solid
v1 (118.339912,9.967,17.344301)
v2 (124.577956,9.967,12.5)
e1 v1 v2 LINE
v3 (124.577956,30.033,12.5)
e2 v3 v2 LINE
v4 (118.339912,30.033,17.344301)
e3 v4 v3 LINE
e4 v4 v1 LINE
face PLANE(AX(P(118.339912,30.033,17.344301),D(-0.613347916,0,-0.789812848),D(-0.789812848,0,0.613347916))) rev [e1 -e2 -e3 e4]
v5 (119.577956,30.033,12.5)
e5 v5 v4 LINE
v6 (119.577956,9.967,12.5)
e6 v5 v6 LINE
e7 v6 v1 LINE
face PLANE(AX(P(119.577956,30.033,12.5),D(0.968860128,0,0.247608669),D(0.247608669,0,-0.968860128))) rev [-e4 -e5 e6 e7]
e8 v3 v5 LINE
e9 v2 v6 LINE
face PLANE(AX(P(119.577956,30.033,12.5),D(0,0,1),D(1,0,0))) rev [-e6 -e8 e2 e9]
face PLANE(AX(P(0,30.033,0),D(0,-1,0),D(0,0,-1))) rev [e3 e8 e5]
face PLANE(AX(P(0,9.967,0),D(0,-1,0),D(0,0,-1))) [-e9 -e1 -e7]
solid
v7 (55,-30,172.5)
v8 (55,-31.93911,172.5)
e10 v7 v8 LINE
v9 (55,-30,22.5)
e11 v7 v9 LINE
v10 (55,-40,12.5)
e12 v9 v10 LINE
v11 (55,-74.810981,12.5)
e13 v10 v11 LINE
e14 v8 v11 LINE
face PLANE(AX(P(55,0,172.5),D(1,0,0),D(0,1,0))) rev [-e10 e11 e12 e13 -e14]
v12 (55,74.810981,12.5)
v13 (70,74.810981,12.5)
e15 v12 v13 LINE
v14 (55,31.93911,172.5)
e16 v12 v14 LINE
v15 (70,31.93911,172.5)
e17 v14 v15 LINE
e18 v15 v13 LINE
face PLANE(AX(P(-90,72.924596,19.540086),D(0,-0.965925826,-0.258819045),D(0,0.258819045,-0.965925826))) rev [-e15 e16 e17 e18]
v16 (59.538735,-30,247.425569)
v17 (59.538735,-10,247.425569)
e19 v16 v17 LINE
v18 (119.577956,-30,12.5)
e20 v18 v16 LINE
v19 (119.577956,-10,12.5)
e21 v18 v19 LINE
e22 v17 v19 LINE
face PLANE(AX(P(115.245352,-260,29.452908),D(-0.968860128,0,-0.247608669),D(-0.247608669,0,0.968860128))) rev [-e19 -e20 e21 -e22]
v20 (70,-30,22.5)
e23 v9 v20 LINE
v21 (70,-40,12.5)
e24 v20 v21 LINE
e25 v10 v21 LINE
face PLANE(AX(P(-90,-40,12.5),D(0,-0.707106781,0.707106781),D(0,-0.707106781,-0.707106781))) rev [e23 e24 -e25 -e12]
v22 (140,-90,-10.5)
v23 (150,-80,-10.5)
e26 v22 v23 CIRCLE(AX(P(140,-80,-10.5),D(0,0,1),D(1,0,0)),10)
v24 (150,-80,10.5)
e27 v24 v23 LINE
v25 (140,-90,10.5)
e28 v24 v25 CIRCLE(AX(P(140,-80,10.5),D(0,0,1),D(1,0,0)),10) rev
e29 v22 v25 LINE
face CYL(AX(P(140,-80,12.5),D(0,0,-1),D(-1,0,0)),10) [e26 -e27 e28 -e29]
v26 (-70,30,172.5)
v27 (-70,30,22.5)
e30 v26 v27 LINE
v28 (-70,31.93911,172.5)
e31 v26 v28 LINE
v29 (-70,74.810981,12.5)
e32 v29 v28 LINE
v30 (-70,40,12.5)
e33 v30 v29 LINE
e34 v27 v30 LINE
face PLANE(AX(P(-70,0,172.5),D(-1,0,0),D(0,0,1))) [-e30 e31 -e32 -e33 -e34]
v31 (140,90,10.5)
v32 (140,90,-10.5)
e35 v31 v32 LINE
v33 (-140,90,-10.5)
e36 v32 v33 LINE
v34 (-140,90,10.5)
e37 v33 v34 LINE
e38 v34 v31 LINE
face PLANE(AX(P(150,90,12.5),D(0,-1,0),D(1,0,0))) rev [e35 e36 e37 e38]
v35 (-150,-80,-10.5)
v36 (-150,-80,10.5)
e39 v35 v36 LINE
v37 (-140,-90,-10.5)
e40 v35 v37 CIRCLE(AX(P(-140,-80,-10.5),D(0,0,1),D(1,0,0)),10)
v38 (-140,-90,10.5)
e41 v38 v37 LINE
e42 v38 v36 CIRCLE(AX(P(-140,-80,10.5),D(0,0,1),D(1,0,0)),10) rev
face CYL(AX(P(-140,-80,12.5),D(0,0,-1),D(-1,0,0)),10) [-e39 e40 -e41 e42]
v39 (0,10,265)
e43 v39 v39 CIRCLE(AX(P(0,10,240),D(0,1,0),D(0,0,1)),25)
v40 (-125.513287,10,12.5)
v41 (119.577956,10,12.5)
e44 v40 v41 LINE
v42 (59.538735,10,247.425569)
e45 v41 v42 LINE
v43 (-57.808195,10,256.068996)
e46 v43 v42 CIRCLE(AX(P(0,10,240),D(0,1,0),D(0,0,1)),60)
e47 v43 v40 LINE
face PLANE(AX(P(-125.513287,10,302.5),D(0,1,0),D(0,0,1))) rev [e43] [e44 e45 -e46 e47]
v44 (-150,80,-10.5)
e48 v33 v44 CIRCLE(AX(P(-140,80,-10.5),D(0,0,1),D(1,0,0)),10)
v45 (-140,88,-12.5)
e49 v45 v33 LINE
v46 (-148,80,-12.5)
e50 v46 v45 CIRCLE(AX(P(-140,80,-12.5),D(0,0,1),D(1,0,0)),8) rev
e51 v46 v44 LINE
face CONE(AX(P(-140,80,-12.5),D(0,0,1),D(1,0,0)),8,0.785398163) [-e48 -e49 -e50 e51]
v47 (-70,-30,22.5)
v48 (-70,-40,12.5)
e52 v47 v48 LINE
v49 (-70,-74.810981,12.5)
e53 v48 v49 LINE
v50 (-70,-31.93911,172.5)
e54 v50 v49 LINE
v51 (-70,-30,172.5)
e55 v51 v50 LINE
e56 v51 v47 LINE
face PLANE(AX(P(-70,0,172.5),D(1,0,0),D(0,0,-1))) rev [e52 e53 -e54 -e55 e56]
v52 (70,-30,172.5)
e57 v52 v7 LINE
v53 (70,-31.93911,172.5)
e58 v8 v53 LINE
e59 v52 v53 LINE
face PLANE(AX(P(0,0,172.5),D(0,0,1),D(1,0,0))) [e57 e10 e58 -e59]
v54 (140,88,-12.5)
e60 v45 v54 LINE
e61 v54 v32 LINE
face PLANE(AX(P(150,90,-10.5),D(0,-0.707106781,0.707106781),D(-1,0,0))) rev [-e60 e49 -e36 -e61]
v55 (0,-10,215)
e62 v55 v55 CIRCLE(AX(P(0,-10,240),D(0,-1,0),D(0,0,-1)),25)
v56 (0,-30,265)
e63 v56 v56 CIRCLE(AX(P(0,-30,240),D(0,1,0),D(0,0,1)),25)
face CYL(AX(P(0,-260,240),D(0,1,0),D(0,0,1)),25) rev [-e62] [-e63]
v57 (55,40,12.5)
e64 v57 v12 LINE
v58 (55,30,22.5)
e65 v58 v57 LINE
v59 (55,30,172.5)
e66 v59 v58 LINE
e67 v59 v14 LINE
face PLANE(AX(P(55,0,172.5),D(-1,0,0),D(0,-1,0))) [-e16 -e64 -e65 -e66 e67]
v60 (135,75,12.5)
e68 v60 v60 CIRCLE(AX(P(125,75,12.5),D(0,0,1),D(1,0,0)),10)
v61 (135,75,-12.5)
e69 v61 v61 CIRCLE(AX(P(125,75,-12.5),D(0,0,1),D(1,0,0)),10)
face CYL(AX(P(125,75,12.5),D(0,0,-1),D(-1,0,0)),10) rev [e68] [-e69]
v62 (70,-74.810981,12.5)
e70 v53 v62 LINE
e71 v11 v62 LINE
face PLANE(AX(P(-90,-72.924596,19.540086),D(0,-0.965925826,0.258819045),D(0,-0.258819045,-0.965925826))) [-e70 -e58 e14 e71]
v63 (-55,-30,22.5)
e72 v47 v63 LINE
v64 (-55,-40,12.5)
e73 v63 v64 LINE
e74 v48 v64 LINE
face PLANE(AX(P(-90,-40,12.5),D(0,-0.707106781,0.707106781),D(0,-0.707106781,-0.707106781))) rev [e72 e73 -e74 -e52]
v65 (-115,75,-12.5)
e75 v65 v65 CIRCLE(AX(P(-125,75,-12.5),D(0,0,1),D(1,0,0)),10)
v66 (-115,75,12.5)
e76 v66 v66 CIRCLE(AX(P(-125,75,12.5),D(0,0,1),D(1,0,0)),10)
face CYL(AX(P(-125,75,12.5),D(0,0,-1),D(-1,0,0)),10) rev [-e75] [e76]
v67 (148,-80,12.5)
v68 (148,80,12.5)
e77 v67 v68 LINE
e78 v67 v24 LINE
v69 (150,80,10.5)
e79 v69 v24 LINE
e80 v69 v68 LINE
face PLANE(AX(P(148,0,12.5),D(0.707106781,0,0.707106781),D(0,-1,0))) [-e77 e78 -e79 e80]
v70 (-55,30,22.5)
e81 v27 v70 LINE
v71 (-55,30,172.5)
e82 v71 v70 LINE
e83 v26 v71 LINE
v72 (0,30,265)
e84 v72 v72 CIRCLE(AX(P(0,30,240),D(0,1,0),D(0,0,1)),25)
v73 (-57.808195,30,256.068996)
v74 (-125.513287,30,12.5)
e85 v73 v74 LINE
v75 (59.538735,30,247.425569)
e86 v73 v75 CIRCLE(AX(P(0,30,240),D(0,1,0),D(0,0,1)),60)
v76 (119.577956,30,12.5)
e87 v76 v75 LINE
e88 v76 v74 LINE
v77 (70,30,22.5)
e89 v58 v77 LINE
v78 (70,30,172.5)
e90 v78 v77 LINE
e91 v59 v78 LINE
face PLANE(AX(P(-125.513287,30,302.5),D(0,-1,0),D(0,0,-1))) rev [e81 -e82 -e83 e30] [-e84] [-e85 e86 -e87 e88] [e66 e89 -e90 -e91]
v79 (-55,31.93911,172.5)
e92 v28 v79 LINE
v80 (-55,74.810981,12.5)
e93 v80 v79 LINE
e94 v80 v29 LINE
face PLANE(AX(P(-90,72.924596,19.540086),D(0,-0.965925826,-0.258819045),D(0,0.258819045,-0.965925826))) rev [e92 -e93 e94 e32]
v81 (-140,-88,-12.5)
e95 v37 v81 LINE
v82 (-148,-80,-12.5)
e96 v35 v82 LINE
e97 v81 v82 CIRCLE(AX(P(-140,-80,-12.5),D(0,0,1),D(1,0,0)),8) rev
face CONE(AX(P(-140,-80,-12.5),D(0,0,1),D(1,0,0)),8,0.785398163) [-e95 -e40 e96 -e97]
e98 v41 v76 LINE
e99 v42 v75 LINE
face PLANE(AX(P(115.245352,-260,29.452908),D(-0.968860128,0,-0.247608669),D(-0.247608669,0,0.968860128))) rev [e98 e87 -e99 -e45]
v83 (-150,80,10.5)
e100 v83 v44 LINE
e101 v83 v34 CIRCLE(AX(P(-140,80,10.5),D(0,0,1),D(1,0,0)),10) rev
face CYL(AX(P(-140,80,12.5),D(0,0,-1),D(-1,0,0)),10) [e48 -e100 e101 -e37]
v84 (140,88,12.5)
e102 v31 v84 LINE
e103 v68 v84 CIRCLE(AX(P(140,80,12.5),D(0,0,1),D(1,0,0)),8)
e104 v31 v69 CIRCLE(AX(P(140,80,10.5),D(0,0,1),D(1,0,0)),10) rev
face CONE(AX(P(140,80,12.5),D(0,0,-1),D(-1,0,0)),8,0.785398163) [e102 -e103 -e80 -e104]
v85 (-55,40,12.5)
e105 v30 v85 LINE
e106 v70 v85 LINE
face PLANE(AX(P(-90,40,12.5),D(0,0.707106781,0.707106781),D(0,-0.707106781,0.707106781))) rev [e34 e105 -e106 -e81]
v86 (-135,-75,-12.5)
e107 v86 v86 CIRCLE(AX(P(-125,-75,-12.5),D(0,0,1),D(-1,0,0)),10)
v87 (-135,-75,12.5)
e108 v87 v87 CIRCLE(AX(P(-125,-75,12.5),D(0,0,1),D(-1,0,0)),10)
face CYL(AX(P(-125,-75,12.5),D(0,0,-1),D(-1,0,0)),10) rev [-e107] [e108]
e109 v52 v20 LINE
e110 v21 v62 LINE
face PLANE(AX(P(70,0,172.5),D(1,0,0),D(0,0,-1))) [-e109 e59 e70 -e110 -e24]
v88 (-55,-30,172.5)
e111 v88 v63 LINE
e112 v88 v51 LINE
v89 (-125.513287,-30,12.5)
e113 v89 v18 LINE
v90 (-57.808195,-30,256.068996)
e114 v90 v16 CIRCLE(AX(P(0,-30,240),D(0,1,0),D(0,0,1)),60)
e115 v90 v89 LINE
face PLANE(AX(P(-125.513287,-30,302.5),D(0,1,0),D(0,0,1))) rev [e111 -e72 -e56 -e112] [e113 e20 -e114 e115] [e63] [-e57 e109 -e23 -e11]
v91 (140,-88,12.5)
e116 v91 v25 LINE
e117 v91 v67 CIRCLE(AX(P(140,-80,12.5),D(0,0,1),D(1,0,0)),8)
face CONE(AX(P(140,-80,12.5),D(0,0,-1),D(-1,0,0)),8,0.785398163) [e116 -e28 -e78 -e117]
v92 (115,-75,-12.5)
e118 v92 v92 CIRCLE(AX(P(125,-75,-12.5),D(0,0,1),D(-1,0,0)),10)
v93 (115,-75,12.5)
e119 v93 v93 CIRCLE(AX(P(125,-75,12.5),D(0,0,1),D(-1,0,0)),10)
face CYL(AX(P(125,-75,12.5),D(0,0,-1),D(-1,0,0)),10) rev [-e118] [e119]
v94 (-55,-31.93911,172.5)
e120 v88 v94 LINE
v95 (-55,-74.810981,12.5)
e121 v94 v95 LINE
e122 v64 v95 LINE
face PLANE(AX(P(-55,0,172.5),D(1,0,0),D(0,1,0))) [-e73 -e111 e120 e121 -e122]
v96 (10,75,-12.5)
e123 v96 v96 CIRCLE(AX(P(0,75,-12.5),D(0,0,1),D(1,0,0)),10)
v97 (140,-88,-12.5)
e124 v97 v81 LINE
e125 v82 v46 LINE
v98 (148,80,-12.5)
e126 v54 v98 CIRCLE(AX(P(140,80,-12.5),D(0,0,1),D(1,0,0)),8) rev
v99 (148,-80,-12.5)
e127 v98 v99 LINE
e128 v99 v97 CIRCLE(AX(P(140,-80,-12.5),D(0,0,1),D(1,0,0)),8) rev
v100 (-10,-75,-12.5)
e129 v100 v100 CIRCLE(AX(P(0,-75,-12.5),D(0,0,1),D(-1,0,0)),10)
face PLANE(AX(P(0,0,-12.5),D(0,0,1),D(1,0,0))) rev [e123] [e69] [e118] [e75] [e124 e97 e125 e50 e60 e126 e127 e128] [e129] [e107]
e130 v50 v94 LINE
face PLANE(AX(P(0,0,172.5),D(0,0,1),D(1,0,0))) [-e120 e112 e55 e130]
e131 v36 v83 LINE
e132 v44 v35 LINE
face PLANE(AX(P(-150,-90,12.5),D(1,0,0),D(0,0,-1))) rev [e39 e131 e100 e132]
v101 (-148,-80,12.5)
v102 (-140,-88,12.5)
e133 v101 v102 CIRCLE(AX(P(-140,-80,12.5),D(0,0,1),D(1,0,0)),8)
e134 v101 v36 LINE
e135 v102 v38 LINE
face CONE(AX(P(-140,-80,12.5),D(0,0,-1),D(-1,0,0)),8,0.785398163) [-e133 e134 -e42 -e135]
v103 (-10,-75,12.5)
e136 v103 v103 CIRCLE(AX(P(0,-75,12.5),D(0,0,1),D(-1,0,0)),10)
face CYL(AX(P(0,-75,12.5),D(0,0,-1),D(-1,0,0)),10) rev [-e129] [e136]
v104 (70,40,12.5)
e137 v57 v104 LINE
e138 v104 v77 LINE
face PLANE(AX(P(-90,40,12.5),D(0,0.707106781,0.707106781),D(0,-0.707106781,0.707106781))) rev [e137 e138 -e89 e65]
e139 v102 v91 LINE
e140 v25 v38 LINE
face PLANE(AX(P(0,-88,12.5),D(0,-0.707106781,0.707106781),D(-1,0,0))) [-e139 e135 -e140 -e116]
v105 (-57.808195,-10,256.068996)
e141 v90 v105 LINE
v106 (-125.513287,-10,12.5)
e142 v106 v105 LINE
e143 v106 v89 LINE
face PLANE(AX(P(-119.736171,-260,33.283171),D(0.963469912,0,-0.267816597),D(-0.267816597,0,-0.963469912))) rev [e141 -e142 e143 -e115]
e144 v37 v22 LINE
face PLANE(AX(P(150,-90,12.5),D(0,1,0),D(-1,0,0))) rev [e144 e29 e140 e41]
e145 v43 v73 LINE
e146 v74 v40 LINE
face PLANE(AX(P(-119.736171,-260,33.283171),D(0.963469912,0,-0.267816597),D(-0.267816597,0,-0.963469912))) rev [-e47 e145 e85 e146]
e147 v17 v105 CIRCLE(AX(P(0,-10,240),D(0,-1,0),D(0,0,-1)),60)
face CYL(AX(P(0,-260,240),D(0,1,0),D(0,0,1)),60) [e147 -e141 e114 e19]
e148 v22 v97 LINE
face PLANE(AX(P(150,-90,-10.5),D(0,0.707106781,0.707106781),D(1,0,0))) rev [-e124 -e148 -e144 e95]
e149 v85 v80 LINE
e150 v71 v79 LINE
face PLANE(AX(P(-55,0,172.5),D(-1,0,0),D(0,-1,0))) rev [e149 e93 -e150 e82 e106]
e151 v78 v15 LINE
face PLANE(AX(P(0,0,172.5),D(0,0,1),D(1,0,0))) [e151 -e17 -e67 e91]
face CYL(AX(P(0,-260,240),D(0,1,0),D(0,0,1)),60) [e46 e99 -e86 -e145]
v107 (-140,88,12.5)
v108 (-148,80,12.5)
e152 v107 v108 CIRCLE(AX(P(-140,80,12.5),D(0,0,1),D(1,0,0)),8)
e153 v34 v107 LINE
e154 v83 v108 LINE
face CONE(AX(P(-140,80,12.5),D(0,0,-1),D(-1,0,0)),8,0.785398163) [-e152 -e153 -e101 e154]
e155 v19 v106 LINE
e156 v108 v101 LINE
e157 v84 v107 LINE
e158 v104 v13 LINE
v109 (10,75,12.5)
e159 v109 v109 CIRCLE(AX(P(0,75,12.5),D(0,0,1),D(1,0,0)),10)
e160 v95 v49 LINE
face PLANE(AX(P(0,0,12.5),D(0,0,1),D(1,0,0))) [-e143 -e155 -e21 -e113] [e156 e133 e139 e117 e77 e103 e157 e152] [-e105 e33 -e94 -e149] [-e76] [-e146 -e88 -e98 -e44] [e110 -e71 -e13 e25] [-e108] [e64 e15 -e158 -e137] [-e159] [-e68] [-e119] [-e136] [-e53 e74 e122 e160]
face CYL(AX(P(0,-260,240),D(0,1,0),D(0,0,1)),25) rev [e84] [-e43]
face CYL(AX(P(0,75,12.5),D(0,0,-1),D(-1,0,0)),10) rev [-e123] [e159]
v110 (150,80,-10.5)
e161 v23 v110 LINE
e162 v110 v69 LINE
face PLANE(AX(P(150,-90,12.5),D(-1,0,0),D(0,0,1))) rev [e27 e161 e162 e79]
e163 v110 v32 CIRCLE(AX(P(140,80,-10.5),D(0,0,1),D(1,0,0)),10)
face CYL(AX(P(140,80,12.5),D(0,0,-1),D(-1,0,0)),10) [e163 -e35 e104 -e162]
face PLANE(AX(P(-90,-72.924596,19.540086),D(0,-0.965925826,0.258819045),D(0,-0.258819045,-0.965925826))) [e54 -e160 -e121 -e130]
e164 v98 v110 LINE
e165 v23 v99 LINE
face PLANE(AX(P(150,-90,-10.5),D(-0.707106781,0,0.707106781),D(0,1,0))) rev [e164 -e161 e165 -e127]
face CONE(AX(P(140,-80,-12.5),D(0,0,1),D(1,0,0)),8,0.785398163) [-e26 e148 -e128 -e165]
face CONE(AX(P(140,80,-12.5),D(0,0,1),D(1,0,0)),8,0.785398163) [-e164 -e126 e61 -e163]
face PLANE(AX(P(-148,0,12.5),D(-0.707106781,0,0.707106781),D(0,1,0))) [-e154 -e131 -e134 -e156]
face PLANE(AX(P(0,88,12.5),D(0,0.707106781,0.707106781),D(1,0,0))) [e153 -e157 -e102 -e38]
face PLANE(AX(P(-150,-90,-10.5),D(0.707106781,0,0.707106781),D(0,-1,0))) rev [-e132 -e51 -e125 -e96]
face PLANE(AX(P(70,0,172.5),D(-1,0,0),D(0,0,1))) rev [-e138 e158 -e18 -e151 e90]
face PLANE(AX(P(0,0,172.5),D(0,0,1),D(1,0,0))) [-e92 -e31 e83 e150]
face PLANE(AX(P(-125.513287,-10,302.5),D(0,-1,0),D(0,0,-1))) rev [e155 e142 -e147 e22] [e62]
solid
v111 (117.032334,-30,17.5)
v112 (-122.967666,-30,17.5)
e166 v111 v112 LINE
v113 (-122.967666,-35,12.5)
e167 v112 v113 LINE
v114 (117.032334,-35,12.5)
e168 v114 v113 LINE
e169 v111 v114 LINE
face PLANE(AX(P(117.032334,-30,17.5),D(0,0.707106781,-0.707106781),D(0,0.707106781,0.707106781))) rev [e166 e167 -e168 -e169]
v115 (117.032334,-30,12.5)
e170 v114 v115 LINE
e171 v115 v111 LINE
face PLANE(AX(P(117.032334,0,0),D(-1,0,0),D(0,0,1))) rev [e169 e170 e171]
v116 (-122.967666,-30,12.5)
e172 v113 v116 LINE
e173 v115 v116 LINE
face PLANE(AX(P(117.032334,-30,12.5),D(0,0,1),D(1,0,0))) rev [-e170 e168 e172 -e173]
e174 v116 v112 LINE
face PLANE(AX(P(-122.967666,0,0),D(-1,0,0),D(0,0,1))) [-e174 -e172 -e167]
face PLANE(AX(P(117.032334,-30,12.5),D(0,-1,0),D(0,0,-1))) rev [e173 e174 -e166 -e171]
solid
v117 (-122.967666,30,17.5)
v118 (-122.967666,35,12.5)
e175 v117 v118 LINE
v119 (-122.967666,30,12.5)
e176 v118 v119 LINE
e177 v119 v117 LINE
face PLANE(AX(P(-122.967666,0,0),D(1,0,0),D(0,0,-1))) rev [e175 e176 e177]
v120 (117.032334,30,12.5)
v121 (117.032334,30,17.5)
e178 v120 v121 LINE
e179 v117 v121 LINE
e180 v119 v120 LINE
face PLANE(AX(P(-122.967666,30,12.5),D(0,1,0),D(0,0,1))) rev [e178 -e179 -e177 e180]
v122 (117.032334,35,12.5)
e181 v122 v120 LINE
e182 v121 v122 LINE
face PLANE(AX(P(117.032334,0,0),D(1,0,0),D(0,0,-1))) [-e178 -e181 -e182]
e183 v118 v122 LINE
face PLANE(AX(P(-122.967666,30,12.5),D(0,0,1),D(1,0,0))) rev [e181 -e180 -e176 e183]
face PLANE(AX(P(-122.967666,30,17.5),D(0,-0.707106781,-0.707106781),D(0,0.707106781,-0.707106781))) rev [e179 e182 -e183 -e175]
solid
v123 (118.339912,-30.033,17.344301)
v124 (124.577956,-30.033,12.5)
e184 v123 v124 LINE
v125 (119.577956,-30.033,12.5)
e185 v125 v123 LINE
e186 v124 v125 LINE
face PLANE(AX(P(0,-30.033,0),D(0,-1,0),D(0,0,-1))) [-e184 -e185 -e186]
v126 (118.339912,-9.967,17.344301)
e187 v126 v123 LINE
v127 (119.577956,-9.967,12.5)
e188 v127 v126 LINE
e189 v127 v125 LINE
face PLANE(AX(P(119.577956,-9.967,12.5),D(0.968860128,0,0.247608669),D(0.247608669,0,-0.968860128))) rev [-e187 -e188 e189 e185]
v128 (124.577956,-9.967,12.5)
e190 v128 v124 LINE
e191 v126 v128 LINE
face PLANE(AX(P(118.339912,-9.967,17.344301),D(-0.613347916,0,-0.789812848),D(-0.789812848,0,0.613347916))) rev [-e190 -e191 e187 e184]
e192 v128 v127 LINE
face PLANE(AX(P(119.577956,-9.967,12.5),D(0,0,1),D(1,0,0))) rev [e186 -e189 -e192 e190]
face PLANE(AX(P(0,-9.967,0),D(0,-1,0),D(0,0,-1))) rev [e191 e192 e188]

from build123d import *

# Parameters (mm, degrees)
SKETCH2_W           = 300
SKETCH2_H           = 180
SKETCH2_R           = 10
BOSS_EXTRUDE1_DEPTH = 12.5
FILLET1_R           = 10
CHAMFER3_SIZE       = 2
SKETCH3_W           = 245.602376855
SKETCH3_H           = 20
BOSS_EXTRUDE2_DEPTH = 290
SKETCH4_R           = 25
CUT_EXTRUDE2_DEPTH  = 290
SKETCH5_W           = 15
SKETCH5_H           = 44.810981007
BOSS_EXTRUDE3_DEPTH = 160
CUT_EXTRUDE4_DEPTH  = 160
CUT_EXTRUDE5_DEPTH  = 160
GUSSET4_START       = 9.967
GUSSET4_DEPTH       = 20.066
GUSSET5_START       = -30.033
GUSSET5_DEPTH       = 20.066
GUSSET6_THICKNESS   = 240
GUSSET7_THICKNESS   = 240


# Read off the part's stored shape, not the designer's step: Gusset4, Gusset5
with BuildPart() as part:
    # Sketch2 → Boss-Extrude1 (new, symmetric)
    with BuildSketch(Plane.XY):
        Rectangle(SKETCH2_W, SKETCH2_H)
        with Locations((125, 75)):
            Circle(SKETCH2_R, mode=Mode.SUBTRACT)
        with Locations((-125, 75)):
            Circle(SKETCH2_R, mode=Mode.SUBTRACT)
        with Locations((0, 75)):
            Circle(SKETCH2_R, mode=Mode.SUBTRACT)
        with Locations(Location((125, -75, 0), (0, 0, 180))):
            Circle(SKETCH2_R, mode=Mode.SUBTRACT)
        with Locations(Location((0, -75, 0), (0, 0, 180))):
            Circle(SKETCH2_R, mode=Mode.SUBTRACT)
        with Locations(Location((-125, -75, 0), (0, 0, 180))):
            Circle(SKETCH2_R, mode=Mode.SUBTRACT)
    extrude(amount=BOSS_EXTRUDE1_DEPTH, both=True)

    # Fillet1
    fillet1_edges = [part.edges().sort_by_distance(p)[0] for p in [
        (-150, 90, 0),
        (150, 90, 0),
        (150, -90, 0),
        (-150, -90, 0),
    ]]
    fillet(fillet1_edges, radius=FILLET1_R)

    # Chamfer3
    chamfer3_edges = [part.edges().sort_by_distance(p)[0] for p in [
        (-150, 0, -12.5),
        (-150, 0, 12.5),
        (0, 90, -12.5),
        (150, 0, -12.5),
        (0, -90, -12.5),
        (147.071067812, 87.071067812, -12.5),
        (147.071067812, -87.071067812, -12.5),
        (-147.071067812, -87.071067812, -12.5),
        (-147.071067812, 87.071067812, -12.5),
        (0, 90, 12.5),
        (0, -90, 12.5),
        (150, 0, 12.5),
        (147.071067812, 87.071067812, 12.5),
        (147.071067812, -87.071067812, 12.5),
        (-147.071067812, -87.071067812, 12.5),
        (-147.071067812, 87.071067812, 12.5),
    ]]
    chamfer(chamfer3_edges, length=CHAMFER3_SIZE)

    # Sketch3 → Boss-Extrude2 (add)
    with BuildSketch(Plane.XY.offset(12.5)):
        with Locations((-2.712098758, 20)):
            Rectangle(SKETCH3_W, SKETCH3_H)
        with Locations((-2.712098758, -20)):
            Rectangle(SKETCH3_W, SKETCH3_H)
    extrude(amount=BOSS_EXTRUDE2_DEPTH)

    # Sketch4 → Cut-Extrude2 (cut)
    with BuildSketch(Plane(origin=(0, 30, 0), x_dir=(1, 0, 0), z_dir=(0, 1, 0))):
        with Locations(Location((0, -240, 0), (0, 0, 270))):
            Circle(SKETCH4_R)
        with BuildLine():
            Line((120.08908967, -12.5), (119.577955686, -12.5))
            Line((119.577955686, -12.5), (59.538734687, -247.42556879))
            ThreePointArc((59.538734687, -247.42556879), (4.407482246, -299.837898528), (-57.808194698, -256.068995792))
            Line((-57.808194698, -256.068995792), (-125.513287185, -12.5))
            Line((-125.513287185, -12.5), (-125.513287185, -302.5))
            Line((-125.513287185, -302.5), (120.08908967, -302.5))
            Line((120.08908967, -302.5), (120.08908967, -12.5))
        make_face()
    extrude(amount=-CUT_EXTRUDE2_DEPTH, mode=Mode.SUBTRACT)

    # Sketch5 → Boss-Extrude3 (add)
    with BuildSketch(Plane.XY.offset(12.5)):
        with Locations((-62.5, 52.405490504)):
            Rectangle(SKETCH5_W, SKETCH5_H)
        with Locations((62.5, 52.405490504)):
            Rectangle(SKETCH5_W, SKETCH5_H)
        with Locations((-62.5, -52.405490504)):
            Rectangle(SKETCH5_W, SKETCH5_H)
        with Locations((62.5, -52.405490504)):
            Rectangle(SKETCH5_W, SKETCH5_H)
    extrude(amount=BOSS_EXTRUDE3_DEPTH)

    # Sketch6 → Cut-Extrude4 (cut)
    with BuildSketch(Plane(origin=(70, 0, 0), x_dir=(0, 0, -1), z_dir=(1, 0, 0))):
        Polygon((-172.5, 74.810981007), (-12.5, 74.810981007), (-172.5, 117.749424337), align=None)
        Polygon((-172.5, 74.810981007), (-172.5, 31.939110218), (-12.5, 74.810981007), align=None)
        Polygon((-12.5, -74.810981007), (-172.5, -31.939110218), (-172.5, -117.749424337), align=None)
    extrude(amount=-CUT_EXTRUDE4_DEPTH, mode=Mode.SUBTRACT)

    # Sketch8 → Cut-Extrude5 (cut)
    with BuildSketch(Plane(origin=(70, 0, 0), x_dir=(0, 0, -1), z_dir=(1, 0, 0))):
        Polygon((-12.5, 40), (-22.5, 30), (-12.5, 30), align=None)
        Polygon((-12.5, -40), (-12.5, -30), (-22.5, -30), align=None)
    extrude(amount=-CUT_EXTRUDE5_DEPTH, mode=Mode.SUBTRACT)


with BuildPart() as body_2:
    # Gusset4 outline → Gusset4 (new body)
    with BuildSketch(Plane(origin=(0, 0, 0), x_dir=(1, 0, 0), z_dir=(0, 1, 0)).offset(GUSSET4_START)):
        Polygon((118.339912342, -17.344300639), (124.577955686, -12.5), (119.577955686, -12.5), align=None)
    extrude(amount=GUSSET4_DEPTH)


with BuildPart() as body_3:
    # Gusset5 outline → Gusset5 (new body)
    with BuildSketch(Plane(origin=(0, 0, 0), x_dir=(1, 0, 0), z_dir=(0, 1, 0)).offset(GUSSET5_START)):
        Polygon((118.339912342, -17.344300639), (124.577955686, -12.5), (119.577955686, -12.5), align=None)
    extrude(amount=GUSSET5_DEPTH)


with BuildPart() as body_4:
    # Gusset6: a gusset: a plate 240.0 thick in the corner of two members, its outline drawn in place
    gusset6_outline = Wire([Line((-122.96766575, 30, 12.5), (-122.96766575, 30, 17.5)), Line((-122.96766575, 30, 17.5), (-122.96766575, 35, 12.5)), Line((-122.96766575, 35, 12.5), (-122.96766575, 30, 12.5))])
    add(extrude(Face(gusset6_outline), amount=GUSSET6_THICKNESS, dir=(1, 0, 0)))


with BuildPart() as body_5:
    # Gusset7: a gusset: a plate 240.0 thick in the corner of two members, its outline drawn in place
    gusset7_outline = Wire([Line((117.03233425, -30, 12.5), (117.03233425, -30, 17.5)), Line((117.03233425, -30, 17.5), (117.03233425, -35, 12.5)), Line((117.03233425, -35, 12.5), (117.03233425, -30, 12.5))])
    add(extrude(Face(gusset7_outline), amount=GUSSET7_THICKNESS, dir=(-1, 0, 0)))


solid = Compound([part.part, body_2.part, body_3.part, body_4.part, body_5.part])
